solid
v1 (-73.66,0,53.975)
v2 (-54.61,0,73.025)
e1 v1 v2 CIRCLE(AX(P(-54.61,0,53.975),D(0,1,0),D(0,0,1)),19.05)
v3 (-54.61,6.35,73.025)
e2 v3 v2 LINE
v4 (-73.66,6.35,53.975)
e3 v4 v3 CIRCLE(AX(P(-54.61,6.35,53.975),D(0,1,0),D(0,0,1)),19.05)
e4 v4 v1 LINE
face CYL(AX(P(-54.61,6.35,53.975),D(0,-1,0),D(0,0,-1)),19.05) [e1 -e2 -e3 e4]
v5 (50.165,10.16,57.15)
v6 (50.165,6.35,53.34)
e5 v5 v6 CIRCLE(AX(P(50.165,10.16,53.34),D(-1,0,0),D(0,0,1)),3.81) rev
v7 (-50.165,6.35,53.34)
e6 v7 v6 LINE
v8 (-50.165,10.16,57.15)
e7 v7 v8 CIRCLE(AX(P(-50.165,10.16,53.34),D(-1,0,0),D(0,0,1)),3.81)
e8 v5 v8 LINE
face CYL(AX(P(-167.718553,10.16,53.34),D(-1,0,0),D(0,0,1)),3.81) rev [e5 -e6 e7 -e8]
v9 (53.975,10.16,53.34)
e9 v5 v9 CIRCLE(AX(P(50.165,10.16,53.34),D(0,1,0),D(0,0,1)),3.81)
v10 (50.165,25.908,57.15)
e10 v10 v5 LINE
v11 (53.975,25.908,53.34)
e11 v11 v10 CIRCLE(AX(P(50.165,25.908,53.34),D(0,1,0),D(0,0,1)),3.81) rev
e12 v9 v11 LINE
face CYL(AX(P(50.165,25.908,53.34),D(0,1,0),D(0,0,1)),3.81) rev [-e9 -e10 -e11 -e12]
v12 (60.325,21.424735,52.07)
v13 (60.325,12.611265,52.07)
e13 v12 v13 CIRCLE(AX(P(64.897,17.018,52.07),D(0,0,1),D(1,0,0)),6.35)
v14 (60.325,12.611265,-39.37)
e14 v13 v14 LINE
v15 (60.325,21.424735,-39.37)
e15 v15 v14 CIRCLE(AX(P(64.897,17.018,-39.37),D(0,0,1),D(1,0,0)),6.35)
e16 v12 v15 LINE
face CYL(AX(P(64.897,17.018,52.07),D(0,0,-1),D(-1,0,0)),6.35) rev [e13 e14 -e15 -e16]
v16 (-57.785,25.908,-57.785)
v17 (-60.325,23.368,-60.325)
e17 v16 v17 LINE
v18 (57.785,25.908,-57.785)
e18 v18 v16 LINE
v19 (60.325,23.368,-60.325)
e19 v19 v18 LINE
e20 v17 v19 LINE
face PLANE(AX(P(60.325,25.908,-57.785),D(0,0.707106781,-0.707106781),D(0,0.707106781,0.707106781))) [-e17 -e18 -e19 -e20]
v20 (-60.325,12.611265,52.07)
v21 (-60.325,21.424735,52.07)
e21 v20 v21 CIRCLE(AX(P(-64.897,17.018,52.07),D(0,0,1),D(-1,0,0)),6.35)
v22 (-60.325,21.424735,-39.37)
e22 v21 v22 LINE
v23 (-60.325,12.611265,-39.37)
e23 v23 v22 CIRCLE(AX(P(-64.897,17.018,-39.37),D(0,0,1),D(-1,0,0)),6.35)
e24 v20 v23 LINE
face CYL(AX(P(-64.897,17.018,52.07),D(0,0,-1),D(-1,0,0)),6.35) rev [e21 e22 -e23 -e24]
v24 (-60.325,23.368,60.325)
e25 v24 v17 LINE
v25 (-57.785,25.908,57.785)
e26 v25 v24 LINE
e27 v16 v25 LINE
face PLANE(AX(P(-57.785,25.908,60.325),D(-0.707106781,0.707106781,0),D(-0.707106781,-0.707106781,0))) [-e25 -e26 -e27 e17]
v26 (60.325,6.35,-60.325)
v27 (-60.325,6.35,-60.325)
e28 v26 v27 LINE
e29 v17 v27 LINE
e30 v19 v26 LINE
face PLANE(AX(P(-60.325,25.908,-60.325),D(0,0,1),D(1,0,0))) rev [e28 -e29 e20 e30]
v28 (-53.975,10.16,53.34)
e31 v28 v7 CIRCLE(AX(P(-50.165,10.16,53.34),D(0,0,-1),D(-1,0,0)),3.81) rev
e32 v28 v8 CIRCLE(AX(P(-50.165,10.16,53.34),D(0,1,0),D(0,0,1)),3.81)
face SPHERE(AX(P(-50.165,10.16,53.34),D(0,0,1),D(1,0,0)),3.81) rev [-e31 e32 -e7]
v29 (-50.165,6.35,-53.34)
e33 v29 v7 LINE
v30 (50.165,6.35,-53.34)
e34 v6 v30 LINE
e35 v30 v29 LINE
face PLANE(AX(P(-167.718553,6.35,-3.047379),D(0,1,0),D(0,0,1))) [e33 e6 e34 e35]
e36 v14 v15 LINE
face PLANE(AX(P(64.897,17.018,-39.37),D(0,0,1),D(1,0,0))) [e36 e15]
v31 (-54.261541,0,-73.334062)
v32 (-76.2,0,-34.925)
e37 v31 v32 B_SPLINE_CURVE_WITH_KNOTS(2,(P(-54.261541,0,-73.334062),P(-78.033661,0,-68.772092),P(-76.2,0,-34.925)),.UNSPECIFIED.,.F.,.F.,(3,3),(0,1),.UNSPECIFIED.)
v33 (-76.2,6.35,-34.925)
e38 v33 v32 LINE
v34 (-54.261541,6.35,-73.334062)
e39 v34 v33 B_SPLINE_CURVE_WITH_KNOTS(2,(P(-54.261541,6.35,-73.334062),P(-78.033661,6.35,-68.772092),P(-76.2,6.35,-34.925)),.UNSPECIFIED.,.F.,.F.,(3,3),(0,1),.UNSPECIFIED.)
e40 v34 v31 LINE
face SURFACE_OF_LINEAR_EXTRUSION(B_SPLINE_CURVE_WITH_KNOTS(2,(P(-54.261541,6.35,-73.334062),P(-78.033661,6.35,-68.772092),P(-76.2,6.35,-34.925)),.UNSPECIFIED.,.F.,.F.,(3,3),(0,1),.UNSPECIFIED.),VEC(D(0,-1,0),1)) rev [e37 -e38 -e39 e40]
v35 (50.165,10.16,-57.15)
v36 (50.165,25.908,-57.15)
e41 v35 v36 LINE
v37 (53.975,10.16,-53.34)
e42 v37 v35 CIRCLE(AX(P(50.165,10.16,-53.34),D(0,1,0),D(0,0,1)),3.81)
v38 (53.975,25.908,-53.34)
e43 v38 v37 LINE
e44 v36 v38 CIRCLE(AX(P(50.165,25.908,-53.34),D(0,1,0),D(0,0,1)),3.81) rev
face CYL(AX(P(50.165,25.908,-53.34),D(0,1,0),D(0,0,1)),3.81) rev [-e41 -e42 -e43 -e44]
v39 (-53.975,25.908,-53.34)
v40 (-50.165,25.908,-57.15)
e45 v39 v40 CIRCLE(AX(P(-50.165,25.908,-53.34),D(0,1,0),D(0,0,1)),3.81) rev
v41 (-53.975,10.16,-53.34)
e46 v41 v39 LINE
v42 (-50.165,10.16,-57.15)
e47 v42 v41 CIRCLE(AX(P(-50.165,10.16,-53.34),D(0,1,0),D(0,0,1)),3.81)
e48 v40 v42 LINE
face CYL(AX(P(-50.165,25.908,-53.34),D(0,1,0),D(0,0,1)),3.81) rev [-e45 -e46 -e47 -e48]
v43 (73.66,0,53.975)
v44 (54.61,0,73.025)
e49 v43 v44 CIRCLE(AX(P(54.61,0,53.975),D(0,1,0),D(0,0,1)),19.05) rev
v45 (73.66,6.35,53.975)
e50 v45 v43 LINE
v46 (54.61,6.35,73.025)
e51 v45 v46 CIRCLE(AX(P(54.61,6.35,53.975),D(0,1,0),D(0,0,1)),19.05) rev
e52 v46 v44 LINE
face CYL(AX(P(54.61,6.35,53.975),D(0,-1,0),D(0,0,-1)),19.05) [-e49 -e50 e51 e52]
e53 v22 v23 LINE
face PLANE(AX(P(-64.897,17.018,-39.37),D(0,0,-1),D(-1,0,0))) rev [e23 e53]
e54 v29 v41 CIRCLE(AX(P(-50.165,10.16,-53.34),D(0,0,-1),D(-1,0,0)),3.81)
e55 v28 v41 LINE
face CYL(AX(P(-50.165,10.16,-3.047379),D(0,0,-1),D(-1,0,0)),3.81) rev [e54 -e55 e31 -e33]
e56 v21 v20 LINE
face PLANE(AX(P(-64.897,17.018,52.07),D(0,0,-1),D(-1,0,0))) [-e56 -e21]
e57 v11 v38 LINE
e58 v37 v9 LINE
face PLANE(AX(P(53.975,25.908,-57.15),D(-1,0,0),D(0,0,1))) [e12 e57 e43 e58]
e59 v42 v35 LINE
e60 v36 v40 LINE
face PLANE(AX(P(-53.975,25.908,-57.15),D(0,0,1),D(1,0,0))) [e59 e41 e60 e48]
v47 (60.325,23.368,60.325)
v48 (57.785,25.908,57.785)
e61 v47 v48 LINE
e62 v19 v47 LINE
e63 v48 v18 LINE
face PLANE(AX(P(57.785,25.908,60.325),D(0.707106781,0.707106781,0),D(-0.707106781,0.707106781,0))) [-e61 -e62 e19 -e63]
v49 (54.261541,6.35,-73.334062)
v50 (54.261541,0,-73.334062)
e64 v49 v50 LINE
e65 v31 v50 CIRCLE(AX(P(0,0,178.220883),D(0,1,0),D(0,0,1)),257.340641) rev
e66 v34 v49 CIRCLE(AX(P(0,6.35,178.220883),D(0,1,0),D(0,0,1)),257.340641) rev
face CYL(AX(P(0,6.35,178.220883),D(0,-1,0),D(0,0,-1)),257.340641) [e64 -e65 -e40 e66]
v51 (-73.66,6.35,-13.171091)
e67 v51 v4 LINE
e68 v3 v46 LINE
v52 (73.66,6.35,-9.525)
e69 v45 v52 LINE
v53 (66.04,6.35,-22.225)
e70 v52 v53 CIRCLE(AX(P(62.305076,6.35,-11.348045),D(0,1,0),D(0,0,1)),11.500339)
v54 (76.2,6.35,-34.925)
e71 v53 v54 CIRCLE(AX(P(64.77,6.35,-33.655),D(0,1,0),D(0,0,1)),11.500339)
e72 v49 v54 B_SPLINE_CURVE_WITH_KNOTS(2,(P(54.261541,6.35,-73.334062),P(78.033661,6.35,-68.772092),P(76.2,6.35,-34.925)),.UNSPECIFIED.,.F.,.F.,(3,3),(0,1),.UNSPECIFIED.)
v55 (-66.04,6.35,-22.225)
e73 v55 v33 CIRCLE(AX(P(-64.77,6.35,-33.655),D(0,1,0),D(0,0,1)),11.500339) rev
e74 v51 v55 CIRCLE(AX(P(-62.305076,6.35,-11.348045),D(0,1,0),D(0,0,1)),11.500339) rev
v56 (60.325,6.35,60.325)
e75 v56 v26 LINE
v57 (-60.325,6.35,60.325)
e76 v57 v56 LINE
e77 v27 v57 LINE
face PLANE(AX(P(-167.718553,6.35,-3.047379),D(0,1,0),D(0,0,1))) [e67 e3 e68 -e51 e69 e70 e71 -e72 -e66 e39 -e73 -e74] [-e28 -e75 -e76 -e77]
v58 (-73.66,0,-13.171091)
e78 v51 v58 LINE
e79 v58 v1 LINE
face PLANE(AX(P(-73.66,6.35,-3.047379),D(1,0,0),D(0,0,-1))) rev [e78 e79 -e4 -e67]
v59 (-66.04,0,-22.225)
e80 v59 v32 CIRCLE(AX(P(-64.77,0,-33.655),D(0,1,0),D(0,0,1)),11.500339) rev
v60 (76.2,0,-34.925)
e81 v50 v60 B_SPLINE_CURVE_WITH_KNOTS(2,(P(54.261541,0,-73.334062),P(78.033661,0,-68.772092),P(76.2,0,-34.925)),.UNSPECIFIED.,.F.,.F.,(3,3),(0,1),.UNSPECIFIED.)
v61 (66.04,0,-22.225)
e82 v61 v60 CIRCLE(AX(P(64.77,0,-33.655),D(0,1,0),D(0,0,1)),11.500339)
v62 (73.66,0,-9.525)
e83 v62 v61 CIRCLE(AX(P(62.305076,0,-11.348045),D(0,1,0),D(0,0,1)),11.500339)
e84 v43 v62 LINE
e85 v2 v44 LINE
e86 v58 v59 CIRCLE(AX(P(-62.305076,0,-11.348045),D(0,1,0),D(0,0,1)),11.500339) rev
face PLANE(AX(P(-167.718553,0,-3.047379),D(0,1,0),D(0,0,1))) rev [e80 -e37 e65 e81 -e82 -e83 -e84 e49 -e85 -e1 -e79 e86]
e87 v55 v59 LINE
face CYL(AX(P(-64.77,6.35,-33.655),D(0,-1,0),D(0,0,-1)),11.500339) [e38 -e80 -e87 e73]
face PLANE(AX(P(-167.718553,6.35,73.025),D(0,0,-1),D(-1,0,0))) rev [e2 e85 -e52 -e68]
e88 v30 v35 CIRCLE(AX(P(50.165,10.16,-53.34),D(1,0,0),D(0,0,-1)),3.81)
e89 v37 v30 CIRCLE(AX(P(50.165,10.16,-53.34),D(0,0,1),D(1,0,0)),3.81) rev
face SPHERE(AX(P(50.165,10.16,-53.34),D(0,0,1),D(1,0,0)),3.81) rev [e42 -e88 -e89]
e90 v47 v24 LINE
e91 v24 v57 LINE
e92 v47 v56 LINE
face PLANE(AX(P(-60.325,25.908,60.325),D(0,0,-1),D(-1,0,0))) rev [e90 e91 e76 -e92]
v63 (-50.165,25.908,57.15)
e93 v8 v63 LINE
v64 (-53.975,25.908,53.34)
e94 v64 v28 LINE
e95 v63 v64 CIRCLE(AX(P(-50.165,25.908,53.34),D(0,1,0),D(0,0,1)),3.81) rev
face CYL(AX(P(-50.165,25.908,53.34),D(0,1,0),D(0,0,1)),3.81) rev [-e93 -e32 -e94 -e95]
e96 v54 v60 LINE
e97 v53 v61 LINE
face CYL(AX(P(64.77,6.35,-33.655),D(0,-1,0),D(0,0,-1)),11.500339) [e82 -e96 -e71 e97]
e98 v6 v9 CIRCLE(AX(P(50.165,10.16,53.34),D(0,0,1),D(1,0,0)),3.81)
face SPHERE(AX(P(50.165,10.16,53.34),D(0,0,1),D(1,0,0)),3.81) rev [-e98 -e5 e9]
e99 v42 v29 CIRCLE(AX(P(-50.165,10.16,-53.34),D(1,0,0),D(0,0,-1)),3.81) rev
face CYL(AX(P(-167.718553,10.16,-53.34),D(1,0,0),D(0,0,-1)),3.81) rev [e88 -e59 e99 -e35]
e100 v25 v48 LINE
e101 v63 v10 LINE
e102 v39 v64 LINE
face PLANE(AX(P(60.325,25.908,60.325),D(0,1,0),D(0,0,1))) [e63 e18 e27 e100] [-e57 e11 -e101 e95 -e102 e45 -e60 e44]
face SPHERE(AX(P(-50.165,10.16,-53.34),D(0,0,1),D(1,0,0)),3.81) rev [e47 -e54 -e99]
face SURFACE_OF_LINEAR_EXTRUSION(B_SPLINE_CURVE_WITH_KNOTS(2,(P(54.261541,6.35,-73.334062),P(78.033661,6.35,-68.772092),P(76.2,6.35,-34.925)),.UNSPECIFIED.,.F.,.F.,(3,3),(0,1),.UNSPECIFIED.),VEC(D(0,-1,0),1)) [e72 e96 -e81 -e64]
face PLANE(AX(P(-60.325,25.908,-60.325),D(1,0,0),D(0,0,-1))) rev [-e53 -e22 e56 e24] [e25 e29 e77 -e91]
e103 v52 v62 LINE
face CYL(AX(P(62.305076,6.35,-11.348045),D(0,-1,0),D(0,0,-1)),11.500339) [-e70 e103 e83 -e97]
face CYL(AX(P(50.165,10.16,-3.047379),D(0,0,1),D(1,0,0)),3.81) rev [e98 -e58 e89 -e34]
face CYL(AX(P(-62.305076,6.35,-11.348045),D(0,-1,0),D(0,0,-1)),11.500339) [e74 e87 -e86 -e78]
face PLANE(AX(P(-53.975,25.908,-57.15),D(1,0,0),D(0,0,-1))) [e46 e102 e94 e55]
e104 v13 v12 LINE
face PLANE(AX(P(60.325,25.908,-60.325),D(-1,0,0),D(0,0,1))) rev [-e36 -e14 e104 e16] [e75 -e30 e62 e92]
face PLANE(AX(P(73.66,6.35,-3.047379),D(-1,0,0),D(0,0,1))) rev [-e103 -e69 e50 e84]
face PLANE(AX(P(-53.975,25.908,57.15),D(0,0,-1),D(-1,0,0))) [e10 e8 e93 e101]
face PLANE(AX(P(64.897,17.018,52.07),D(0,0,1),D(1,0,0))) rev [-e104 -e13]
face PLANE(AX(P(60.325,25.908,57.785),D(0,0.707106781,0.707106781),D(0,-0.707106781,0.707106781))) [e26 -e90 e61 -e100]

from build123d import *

# Parameters (mm, degrees)
BOSS_EXTRUDE1_DEPTH     = 6.35
SKETCH3_W               = 120.65
SKETCH3_H               = 120.65
SKETCH3_W_2             = 107.95
SKETCH3_H_2             = 114.3
BOSS_EXTRUDE2_DEPTH     = 19.558
FILLET2_R               = 3.81
CUT_EXTRUDE2_DEPTH      = 52.07
CUT_EXTRUDE2_DEPTH_BACK = 39.37
FILLET3_R               = 3.81
CHAMFER1_SIZE           = 2.54


with BuildPart() as part:
    # Sketch2 → Boss-Extrude1 (new body)
    with BuildSketch(Plane(origin=(0, 0, 0), x_dir=(1, 0, 0), z_dir=(0, 1, 0))):
        with BuildLine():
            ThreePointArc((-76.2, 34.925), (-73.750256121, 26.470795103), (-66.04, 22.225))
            ThreePointArc((-66.04, 22.225), (-71.103893825, 18.75335434), (-73.66, 13.171090867))
            Line((-73.66, 13.171090867), (-73.66, -53.975))
            ThreePointArc((-73.66, -53.975), (-68.080384182, -67.445384182), (-54.61, -73.025))
            Line((-54.61, -73.025), (54.61, -73.025))
            ThreePointArc((54.61, -73.025), (68.080384182, -67.445384182), (73.66, -53.975))
            Line((73.66, -53.975), (73.66, 9.525))
            ThreePointArc((73.66, 9.525), (72.166535166, 17.2649211), (66.04, 22.225))
            ThreePointArc((66.04, 22.225), (73.750256121, 26.470795103), (76.2, 34.925))
            add(Edge.make_bspline(
                [(54.26154132, 73.334062346), (78.033661383, 68.772092229), (76.2, 34.925)],
                knots=[0, 0, 0, 1, 1, 1], degree=2))
            ThreePointArc((54.26154132, 73.334062346), (0, 79.119757765), (-54.26154132, 73.334062346))
            add(Edge.make_bspline(
                [(-54.26154132, 73.334062346), (-78.033661383, 68.772092229), (-76.2, 34.925)],
                knots=[0, 0, 0, 1, 1, 1], degree=2))
        make_face()
    extrude(amount=BOSS_EXTRUDE1_DEPTH)

    # Sketch3 → Boss-Extrude2 (add)
    with BuildSketch(Plane(origin=(0, 6.35, 0), x_dir=(1, 0, 0), z_dir=(0, 1, 0))):
        Rectangle(SKETCH3_W, SKETCH3_H)
        Rectangle(SKETCH3_W_2, SKETCH3_H_2, mode=Mode.SUBTRACT)
    extrude(amount=BOSS_EXTRUDE2_DEPTH)

    # Fillet2
    fillet2_edges = [part.edges().sort_by_distance(p)[0] for p in [
        (53.975, 6.35, 0),
        (0, 6.35, -57.15),
        (-53.975, 6.35, 0),
        (0, 6.35, 57.15),
    ]]
    fillet(fillet2_edges, radius=FILLET2_R)

    # Sketch5 → Cut-Extrude2 (cut, two sides: drawn at the far end of the back side and taken through both)
    with BuildSketch(Plane.XY.offset(-CUT_EXTRUDE2_DEPTH_BACK)):
        with BuildLine():
            Line((60.325, 21.4247353), (60.325, 12.6112647))
            ThreePointArc((60.325, 12.6112647), (58.547, 17.018), (60.325, 21.4247353))
        make_face()
        with BuildLine():
            Line((-60.325, 21.4247353), (-60.325, 12.6112647))
            ThreePointArc((-60.325, 12.6112647), (-58.547, 17.018), (-60.325, 21.4247353))
        make_face()
    extrude(amount=CUT_EXTRUDE2_DEPTH + CUT_EXTRUDE2_DEPTH_BACK, mode=Mode.SUBTRACT)

    # Fillet3
    # the kernel refuses this fillet: 3.81 mm, written as the material it adds along each edge
    with BuildSketch(Plane(origin=(-50.165, 10.16, 53.34), x_dir=(0, 0, 1), z_dir=(-1, 0, 0))) as fillet3_piece_1_section:
        Polygon((0, 0), (FILLET3_R, 0), (FILLET3_R, -FILLET3_R), (0, -FILLET3_R), align=None)
    fillet3_piece_1 = extrude(amount=FILLET3_R, mode=Mode.PRIVATE)
    fillet3_piece_1 = fillet3_piece_1 - Plane(origin=(-50.165, 10.16, 53.34), x_dir=(0, 0.7071067811865475, -0.7071067811865475), z_dir=(-1, 0, 0)) * Sphere(FILLET3_R, mode=Mode.PRIVATE)
    add(fillet3_piece_1)
    with BuildSketch(Plane(origin=(-50.165, 10.16, -53.34), x_dir=(0, 0, -1), z_dir=(-1, 0, 0))) as fillet3_piece_2_section:
        Polygon((0, 0), (FILLET3_R, 0), (FILLET3_R, FILLET3_R), (0, FILLET3_R), align=None)
    fillet3_piece_2 = extrude(amount=FILLET3_R, mode=Mode.PRIVATE)
    fillet3_piece_2 = fillet3_piece_2 - Plane(origin=(-50.165, 10.16, -53.34), x_dir=(0, 0.7071067811865475, 0.7071067811865475), z_dir=(-1, 0, 0)) * Sphere(FILLET3_R, mode=Mode.PRIVATE)
    add(fillet3_piece_2)
    with BuildSketch(Plane(origin=(50.165, 10.16, 53.34), x_dir=(1, 0, 0), z_dir=(0, 0, 1))) as fillet3_piece_3_section:
        Polygon((0, 0), (FILLET3_R, 0), (FILLET3_R, -FILLET3_R), (0, -FILLET3_R), align=None)
    fillet3_piece_3 = extrude(amount=FILLET3_R, mode=Mode.PRIVATE)
    fillet3_piece_3 = fillet3_piece_3 - Plane(origin=(50.165, 10.16, 53.34), x_dir=(-0.7071067811865475, 0.7071067811865475, 0), z_dir=(0, 0, 1)) * Sphere(FILLET3_R, mode=Mode.PRIVATE)
    add(fillet3_piece_3)
    with BuildSketch(Plane(origin=(50.165, 10.16, -53.34), x_dir=(1, 0, 0), z_dir=(0, 0, -1))) as fillet3_piece_4_section:
        Polygon((0, 0), (FILLET3_R, 0), (FILLET3_R, FILLET3_R), (0, FILLET3_R), align=None)
    fillet3_piece_4 = extrude(amount=FILLET3_R, mode=Mode.PRIVATE)
    fillet3_piece_4 = fillet3_piece_4 - Plane(origin=(50.165, 10.16, -53.34), x_dir=(-0.7071067811865475, 0.7071067811865475, 0), z_dir=(0, 0, -1)) * Sphere(FILLET3_R, mode=Mode.PRIVATE)
    add(fillet3_piece_4)
    with BuildSketch(Plane(origin=(53.975, 10.16, -57.15), x_dir=(-1, 0, 0), z_dir=(0, 1, 0)), Plane(origin=(-53.975, 10.16, -57.15), x_dir=(0, 0, 1), z_dir=(0, 1, 0))) as fillet3_piece_5:
        with BuildLine():
            CenterArc((FILLET3_R, FILLET3_R), FILLET3_R, 180, 90)
            Line((0, FILLET3_R), (0, 0))
            Line((0, 0), (FILLET3_R, 0))
        make_face()
    extrude(amount=15.748)
    with BuildSketch(Plane(origin=(-53.975, 10.16, 57.15), x_dir=(0, 0, -1), z_dir=(0, 1, 0)), Plane(origin=(53.975, 10.16, 57.15), x_dir=(-1, 0, 0), z_dir=(0, 1, 0))) as fillet3_piece_6:
        with BuildLine():
            CenterArc((FILLET3_R, -FILLET3_R), FILLET3_R, 90, 90)
            Line((0, -FILLET3_R), (0, 0))
            Line((0, 0), (FILLET3_R, 0))
        make_face()
    extrude(amount=15.748)

    # Chamfer1
    chamfer1_edges = [part.edges().sort_by_distance(p)[0] for p in [
        (60.325, 25.908, 0),
        (0, 25.908, -60.325),
        (-60.325, 25.908, 0),
        (0, 25.908, 60.325),
    ]]
    chamfer(chamfer1_edges, length=CHAMFER1_SIZE)


solid = part.part
